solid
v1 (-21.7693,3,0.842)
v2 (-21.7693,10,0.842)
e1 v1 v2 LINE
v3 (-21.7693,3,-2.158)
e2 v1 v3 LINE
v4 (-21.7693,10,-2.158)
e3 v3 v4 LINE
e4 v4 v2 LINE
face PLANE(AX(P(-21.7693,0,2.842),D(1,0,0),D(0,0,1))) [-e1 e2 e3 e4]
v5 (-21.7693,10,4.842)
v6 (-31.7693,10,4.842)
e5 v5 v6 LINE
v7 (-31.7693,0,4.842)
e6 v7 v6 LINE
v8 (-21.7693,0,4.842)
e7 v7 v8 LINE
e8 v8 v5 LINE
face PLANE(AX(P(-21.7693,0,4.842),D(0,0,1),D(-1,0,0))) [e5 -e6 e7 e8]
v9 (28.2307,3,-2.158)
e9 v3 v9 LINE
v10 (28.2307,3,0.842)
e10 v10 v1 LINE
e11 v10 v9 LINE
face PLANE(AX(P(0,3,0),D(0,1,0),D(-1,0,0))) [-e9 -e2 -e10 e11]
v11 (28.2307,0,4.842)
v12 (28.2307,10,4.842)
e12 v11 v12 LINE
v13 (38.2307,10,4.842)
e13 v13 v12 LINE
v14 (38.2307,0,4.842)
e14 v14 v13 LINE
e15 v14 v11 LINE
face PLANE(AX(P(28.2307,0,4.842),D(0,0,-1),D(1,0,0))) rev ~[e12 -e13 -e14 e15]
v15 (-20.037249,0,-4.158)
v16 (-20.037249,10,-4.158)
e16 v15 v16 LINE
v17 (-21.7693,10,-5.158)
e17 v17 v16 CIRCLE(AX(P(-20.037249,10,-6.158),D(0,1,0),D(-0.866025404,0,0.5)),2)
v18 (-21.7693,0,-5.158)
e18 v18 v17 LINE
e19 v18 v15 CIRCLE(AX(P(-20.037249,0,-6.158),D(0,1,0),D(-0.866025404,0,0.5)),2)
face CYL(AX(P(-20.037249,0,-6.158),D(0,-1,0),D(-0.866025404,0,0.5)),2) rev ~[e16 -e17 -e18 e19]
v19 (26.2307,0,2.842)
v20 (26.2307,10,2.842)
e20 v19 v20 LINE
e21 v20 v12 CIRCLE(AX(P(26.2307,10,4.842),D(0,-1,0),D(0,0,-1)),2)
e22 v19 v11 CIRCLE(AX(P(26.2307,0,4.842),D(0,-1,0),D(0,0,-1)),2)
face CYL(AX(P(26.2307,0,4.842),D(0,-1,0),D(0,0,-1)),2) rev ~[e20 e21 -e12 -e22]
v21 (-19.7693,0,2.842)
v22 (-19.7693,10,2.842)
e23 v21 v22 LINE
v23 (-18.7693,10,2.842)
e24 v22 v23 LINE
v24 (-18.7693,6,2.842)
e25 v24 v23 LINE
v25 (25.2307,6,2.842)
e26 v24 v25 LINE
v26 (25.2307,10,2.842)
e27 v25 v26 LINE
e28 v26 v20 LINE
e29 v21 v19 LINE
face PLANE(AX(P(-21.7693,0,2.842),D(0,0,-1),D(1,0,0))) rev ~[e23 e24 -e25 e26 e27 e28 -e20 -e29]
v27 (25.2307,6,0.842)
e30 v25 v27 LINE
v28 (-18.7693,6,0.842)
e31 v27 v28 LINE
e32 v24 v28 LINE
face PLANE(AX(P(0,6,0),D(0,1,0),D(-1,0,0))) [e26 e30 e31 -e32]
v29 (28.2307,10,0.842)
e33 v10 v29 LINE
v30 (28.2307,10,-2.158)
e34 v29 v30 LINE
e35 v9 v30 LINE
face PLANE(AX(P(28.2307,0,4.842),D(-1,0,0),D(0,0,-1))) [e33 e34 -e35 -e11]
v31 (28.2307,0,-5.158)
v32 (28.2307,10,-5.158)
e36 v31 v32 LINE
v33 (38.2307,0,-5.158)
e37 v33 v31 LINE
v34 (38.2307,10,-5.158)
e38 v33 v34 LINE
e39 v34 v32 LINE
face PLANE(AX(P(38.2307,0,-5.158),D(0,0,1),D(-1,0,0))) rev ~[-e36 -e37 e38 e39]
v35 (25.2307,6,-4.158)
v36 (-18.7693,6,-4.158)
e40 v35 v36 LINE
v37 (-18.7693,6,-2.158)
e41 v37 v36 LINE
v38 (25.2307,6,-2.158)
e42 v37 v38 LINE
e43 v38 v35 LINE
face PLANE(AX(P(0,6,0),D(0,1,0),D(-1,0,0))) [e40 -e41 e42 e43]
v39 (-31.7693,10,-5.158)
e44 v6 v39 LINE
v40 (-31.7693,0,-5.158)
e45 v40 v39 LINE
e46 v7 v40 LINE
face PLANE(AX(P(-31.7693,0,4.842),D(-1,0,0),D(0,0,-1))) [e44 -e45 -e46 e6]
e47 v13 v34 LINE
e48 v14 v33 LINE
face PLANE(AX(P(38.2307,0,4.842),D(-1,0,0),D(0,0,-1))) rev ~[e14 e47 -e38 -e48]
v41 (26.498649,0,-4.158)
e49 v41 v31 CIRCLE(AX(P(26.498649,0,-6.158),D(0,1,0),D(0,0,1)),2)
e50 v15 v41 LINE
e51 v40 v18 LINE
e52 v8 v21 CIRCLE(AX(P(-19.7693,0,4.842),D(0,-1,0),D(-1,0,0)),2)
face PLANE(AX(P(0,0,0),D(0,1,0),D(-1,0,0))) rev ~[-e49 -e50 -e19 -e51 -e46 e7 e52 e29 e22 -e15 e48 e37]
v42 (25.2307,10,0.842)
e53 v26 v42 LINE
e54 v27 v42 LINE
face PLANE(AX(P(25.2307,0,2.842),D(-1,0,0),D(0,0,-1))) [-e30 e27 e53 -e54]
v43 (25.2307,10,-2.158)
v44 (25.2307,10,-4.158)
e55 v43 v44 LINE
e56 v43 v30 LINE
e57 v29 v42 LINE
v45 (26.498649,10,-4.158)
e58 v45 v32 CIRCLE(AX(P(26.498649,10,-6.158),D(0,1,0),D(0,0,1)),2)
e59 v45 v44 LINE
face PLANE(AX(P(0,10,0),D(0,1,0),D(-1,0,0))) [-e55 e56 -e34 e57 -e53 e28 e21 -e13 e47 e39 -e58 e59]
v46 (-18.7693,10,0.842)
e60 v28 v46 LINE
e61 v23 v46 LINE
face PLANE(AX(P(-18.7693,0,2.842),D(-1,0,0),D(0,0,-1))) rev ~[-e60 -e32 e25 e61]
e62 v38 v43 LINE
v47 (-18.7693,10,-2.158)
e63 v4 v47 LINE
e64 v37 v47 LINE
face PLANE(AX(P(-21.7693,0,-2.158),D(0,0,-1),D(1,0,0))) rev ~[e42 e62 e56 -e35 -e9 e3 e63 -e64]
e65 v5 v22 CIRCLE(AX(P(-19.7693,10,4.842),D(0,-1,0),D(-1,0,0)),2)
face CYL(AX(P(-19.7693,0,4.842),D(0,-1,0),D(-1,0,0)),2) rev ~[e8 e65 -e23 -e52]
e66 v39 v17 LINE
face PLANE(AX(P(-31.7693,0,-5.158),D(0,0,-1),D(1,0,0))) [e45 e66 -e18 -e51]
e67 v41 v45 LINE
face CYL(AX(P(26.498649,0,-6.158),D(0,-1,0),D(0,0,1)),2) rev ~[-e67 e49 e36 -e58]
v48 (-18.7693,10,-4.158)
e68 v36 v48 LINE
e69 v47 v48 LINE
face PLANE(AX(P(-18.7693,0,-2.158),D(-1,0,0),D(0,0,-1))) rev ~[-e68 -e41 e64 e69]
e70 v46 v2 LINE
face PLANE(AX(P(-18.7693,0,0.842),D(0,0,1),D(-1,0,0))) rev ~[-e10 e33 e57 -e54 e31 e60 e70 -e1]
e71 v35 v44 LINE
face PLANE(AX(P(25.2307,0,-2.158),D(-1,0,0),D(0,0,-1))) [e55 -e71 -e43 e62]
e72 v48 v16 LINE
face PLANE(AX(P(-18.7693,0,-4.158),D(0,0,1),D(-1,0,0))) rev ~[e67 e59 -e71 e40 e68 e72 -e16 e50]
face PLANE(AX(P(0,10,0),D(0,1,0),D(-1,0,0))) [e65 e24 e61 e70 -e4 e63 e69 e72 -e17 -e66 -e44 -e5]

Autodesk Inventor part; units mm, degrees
ref_plane "YZ Plane" through (0, 0, 0) normal (1, 0, 0) x (0, 1, 0)
ref_plane "XZ Plane" through (0, 0, 0) normal (0, 1, 0) x (-1, 0, 0)
ref_plane "XY Plane" through (0, 0, 0) normal (0, 0, 1) x (1, 0, 0)
sketch "스케치1" plane through (0, 0, 0) normal (0, 1, 0) x (-1, 0, 0)
  line L0 (21.7693, 2.842) -> (-28.2307, 2.842)
  line L1 (-28.2307, 2.842) -> (-28.2307, -0.158)
  line L2 (-28.2307, -0.158) -> (21.7693, -0.158)
  line L3 (21.7693, -0.158) -> (21.7693, 2.842)
  line L4 (21.7693, 4.842) -> (-28.2307, 4.842)
  line L5 (-28.2307, 4.842) -> (-28.2307, -4.158)
  line L6 (-28.2307, -4.158) -> (21.7693, -4.158)
  line L7 (21.7693, -4.158) -> (21.7693, 4.842)
  line L8 (-28.2307, 4.842) -> (-38.2307, 4.842)
  line L9 (-38.2307, 4.842) -> (-38.2307, -5.158)
  line L10 (-38.2307, -5.158) -> (-28.2307, -5.158)
  line L11 (-28.2307, -5.158) -> (-28.2307, 4.842)
  line L12 (21.7693, 4.842) -> (31.7693, 4.842)
  line L13 (31.7693, 4.842) -> (31.7693, -5.158)
  line L14 (31.7693, -5.158) -> (21.7693, -5.158)
  line L15 (21.7693, -5.158) -> (21.7693, 4.842)
  circle A0 centre (26.7693, -0.158) radius 1.75
  circle A1 centre (-33.2307, -0.158) radius 1.75
  line L16 (18.7693, 2.842) -> (18.7693, -4.158)
  line L17 (-25.2307, 2.842) -> (-25.2307, -4.158)
  line L18 (-28.2307, 0.842) -> (21.7693, 0.842)
  line L19 (21.7693, 0.842) -> (21.7693, -2.158)
  line L20 (21.7693, -2.158) -> (-28.2307, -2.158)
  line L21 (-28.2307, -2.158) -> (-28.2307, 0.842)
  point P0 (0, 0)
  point P1 (-28.2307, 2.842)
  point P2 (-25.2307, 0.842)
  point P3 (-25.2307, -2.158)
  point P4 (18.7693, -2.158)
  point P5 (18.7693, 0.842)
  dimension "d0" = 50
  dimension "d1" = 3
  dimension "d2" = 10
  dimension "d3" = 10
  dimension "d4" = 0
  dimension "d5" = 2
  dimension "d6" = 10
  dimension "d7" = 10
  dimension "d8" = 0
  dimension "d9" = 3.5
  dimension "d10" = 3.5
  dimension "d11" = 5
  dimension "d12" = 5
  dimension "d13" = 5
  dimension "d14" = 5
  dimension "d15" = 3
  dimension "d16" = 2
  dimension "d17" = 2
  dimension "d18" = 3
  dimension "d19" = 3
extrude "돌출1" add sketch "스케치1" along normal blind 10 contours L7 L12 L13 L14 L15 L3 | L5 L1 L11 L10 L9 L8 | A0 | A1
extrude "돌출2" add sketch "스케치1" along normal blind 10 contours L3 L18 L16 L0 | L17 L18 L1 L0 | L7 L6 L16 L20 | L17 L6 L5 L20
extrude "돌출3" add sketch "스케치1" along normal blind 3 contours L3 L2 L16 L18 | L16 L2 L17 L18 | L7 L20 L16 L2 | L17 L2 L1 L18 | L16 L20 L17 L2 | L17 L20 L5 L2
extrude "돌출4" add sketch "스케치1" along normal blind 6 contours L16 L18 L17 L0 | L16 L6 L17 L20
fillet "모깎기1" radius 2 4 edges at (28.2307, 5, -4.158) (-21.7693, 5, -4.158) (28.2307, 5, 2.842) (-21.7693, 5, 2.842)
sketch "스케치4" plane through (28.2307, 10, -2.158) normal (-1, 0, 0) x (0, 0, 1)
  point P0 (2.158, -10)
equation "\"d3\" = d2"
equation "\"d7\" = d6"
equation "\"d12\" = d11"
equation "\"d14\" = d13"
properties part number "B5-camera-fu"
